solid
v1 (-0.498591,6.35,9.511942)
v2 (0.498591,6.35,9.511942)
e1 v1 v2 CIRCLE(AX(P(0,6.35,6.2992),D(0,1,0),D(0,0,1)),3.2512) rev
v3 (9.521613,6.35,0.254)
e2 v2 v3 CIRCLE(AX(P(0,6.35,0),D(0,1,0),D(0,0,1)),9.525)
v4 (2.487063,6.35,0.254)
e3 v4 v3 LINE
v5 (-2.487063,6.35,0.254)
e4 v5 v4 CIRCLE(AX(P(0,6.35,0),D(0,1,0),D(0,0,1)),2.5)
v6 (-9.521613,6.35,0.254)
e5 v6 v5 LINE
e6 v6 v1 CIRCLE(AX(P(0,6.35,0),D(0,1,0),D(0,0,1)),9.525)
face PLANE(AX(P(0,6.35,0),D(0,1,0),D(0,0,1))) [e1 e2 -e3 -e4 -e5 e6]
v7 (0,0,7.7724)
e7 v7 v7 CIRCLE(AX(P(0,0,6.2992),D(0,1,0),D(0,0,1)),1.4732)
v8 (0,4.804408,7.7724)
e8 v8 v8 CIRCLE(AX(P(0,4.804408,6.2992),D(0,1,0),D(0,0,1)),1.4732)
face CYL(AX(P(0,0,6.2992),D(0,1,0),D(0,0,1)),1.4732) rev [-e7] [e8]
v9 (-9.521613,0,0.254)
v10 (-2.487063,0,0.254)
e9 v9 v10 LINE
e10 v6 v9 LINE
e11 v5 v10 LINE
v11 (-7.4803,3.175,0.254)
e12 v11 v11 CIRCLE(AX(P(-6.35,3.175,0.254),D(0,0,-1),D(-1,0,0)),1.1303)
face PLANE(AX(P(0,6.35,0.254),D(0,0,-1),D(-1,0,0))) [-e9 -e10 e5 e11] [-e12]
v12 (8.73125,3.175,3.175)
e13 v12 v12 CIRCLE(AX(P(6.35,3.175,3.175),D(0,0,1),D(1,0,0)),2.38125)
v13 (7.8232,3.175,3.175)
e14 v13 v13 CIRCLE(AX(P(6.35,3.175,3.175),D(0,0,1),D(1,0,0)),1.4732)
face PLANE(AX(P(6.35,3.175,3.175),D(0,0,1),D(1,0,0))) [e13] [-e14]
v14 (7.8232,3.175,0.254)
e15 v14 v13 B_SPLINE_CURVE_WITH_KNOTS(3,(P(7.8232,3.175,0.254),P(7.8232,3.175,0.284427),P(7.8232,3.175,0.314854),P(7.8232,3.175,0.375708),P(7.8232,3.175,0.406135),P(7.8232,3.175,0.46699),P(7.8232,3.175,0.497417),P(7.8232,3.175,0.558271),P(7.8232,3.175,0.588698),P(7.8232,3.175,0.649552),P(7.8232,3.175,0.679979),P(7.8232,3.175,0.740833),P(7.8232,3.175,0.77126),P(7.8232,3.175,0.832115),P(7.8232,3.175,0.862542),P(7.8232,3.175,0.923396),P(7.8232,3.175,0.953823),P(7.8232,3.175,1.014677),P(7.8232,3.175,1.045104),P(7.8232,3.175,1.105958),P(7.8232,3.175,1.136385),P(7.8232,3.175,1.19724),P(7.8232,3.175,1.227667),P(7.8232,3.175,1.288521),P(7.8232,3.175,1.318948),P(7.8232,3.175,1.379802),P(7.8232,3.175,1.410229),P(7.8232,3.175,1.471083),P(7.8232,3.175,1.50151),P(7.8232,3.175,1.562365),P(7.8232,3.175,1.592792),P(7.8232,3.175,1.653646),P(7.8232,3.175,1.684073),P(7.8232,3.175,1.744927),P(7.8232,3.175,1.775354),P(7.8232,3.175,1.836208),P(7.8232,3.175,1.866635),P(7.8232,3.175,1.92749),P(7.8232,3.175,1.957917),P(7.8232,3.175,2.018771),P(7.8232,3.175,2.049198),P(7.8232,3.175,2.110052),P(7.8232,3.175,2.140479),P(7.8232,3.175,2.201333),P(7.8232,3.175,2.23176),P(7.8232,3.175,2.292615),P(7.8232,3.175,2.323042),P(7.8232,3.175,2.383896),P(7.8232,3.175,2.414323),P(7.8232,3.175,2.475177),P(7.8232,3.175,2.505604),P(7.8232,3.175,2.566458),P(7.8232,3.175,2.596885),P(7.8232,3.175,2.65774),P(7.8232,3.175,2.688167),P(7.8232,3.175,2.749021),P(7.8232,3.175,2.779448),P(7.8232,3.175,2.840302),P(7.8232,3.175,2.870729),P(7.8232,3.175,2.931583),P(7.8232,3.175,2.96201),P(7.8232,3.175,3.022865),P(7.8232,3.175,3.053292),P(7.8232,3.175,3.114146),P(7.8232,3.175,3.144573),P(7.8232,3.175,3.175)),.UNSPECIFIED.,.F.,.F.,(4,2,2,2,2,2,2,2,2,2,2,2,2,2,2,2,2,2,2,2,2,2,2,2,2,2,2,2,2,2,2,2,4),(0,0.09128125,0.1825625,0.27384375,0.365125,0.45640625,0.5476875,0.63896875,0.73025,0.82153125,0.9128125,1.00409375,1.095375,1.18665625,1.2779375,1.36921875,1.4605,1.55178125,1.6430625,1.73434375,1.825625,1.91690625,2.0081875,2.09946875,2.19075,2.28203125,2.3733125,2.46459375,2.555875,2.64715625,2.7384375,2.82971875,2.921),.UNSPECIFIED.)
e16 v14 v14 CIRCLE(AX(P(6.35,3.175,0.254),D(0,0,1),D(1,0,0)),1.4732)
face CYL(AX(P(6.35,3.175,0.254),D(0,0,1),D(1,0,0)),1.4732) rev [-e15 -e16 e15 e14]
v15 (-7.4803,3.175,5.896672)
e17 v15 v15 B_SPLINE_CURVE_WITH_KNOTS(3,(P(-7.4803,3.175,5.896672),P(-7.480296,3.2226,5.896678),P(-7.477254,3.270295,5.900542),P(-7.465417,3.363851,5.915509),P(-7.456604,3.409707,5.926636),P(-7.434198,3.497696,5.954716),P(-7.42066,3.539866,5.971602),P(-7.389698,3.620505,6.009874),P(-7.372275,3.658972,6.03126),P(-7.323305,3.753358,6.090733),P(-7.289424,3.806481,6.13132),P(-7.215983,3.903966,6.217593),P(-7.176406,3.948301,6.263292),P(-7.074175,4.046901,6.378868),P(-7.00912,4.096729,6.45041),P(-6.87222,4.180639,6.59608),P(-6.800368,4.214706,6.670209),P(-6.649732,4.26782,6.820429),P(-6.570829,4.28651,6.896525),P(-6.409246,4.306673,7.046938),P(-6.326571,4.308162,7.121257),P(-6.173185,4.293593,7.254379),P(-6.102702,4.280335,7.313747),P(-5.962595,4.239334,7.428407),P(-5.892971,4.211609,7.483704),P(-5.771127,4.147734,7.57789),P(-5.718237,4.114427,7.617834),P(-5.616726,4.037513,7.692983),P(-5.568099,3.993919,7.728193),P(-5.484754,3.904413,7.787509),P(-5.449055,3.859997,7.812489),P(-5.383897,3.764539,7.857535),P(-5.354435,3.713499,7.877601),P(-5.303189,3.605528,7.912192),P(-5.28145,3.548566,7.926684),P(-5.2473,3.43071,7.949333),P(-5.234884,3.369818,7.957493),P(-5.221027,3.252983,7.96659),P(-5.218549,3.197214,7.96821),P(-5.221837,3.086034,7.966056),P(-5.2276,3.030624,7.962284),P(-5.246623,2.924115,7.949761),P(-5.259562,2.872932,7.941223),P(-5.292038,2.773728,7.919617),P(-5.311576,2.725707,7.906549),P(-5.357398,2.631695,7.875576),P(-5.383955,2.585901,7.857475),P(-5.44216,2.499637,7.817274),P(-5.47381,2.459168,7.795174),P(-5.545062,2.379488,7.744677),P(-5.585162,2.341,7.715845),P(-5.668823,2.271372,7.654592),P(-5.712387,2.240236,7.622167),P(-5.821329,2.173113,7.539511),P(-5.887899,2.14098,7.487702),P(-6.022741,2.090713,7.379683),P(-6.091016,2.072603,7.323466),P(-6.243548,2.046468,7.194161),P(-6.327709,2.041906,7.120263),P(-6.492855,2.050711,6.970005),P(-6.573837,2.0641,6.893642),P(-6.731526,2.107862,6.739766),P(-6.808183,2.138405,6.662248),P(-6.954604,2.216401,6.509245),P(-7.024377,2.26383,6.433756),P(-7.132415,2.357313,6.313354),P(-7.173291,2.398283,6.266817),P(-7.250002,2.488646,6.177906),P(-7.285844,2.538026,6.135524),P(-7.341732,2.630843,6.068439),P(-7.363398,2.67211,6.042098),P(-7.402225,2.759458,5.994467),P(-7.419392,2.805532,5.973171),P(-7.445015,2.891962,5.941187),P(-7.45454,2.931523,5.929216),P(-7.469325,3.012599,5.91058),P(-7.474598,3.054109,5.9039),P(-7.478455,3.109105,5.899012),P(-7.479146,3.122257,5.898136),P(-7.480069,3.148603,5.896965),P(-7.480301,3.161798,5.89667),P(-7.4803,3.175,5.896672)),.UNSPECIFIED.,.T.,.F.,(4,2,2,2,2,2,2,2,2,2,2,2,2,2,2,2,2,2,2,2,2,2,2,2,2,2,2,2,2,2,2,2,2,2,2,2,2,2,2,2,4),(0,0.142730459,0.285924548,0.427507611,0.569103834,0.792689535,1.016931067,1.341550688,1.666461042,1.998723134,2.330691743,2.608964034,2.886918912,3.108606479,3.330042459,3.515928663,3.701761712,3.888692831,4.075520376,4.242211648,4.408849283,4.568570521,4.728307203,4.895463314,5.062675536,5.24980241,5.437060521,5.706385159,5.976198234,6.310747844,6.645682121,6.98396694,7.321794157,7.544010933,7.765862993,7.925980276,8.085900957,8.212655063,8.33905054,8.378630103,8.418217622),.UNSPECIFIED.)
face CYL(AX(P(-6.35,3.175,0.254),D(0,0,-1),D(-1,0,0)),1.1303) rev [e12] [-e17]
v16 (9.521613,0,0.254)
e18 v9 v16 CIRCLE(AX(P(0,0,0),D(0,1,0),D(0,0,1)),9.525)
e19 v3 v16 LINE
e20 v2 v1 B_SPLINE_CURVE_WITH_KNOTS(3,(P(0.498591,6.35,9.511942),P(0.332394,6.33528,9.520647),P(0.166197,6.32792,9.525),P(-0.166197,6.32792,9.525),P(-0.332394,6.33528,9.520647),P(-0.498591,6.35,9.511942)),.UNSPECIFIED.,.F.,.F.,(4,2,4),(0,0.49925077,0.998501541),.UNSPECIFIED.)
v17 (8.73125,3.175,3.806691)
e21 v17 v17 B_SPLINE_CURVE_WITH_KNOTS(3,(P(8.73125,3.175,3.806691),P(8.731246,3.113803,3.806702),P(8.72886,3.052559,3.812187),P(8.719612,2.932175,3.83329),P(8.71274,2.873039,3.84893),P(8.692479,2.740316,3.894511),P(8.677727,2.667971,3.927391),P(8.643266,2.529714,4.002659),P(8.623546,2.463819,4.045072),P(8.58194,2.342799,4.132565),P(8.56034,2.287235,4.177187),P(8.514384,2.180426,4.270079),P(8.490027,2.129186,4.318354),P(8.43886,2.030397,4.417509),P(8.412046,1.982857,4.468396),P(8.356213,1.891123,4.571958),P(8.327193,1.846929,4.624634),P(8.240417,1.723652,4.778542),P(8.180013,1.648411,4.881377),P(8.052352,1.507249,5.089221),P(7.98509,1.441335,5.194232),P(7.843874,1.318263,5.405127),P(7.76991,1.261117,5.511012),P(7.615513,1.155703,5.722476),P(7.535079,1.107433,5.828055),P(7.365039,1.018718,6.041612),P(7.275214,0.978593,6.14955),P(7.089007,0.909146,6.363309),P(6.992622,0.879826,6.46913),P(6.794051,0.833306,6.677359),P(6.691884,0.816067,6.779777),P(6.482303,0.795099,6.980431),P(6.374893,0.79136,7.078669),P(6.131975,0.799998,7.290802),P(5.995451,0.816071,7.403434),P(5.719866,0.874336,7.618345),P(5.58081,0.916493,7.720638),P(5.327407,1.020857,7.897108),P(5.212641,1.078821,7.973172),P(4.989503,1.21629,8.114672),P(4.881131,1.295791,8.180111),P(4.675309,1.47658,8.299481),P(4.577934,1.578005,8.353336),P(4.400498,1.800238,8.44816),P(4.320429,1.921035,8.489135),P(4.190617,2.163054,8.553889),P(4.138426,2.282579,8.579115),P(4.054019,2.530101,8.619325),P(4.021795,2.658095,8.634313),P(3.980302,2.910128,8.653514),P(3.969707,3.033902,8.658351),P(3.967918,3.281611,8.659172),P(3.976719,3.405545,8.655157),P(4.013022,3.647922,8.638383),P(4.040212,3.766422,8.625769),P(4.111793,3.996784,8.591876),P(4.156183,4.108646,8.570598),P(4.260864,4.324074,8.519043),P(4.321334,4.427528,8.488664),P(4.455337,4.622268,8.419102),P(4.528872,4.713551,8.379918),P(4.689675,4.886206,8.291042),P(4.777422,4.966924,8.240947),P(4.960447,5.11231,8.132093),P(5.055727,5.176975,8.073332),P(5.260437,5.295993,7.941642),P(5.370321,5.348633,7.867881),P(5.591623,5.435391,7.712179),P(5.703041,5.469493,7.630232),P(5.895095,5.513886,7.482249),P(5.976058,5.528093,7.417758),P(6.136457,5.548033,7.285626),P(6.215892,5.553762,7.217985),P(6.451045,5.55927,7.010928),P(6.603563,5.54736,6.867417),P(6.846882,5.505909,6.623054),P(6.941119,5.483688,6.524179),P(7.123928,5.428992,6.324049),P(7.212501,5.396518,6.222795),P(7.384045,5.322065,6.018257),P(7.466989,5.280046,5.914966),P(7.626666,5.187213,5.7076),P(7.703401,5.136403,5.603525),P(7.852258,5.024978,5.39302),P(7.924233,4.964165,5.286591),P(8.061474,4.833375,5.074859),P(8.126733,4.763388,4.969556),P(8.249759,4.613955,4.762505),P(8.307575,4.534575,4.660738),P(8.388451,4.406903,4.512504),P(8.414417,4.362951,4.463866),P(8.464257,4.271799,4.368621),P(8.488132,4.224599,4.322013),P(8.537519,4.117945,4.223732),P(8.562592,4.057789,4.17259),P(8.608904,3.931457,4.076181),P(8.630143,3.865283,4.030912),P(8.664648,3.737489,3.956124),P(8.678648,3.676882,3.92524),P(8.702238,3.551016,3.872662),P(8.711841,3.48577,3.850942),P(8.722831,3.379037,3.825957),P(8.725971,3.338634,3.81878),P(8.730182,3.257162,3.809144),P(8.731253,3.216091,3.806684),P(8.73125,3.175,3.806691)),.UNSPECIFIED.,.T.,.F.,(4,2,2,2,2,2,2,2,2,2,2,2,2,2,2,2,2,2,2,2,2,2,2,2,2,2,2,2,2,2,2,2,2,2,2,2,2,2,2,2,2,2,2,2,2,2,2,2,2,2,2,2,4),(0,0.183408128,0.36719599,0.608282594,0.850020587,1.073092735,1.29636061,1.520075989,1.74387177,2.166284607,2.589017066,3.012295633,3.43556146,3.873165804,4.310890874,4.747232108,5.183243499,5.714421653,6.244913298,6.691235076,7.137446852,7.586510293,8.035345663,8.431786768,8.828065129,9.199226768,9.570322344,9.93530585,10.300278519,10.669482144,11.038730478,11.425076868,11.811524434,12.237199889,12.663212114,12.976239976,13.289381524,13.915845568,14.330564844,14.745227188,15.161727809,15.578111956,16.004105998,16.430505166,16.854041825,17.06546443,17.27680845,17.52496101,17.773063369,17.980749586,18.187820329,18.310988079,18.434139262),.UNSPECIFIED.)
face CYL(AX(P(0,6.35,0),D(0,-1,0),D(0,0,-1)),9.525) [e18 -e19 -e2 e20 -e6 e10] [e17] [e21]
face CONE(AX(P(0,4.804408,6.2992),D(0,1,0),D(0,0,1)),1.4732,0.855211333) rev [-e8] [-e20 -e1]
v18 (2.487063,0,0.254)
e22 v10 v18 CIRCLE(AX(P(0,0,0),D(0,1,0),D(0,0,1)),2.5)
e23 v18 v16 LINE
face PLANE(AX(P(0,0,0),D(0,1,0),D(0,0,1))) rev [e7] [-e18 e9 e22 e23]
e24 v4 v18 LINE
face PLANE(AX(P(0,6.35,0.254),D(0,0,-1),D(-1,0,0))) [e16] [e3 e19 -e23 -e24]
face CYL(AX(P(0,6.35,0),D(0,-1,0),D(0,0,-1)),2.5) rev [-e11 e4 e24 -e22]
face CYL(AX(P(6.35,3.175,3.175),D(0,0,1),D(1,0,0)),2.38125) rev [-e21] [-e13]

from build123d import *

# Parameters (mm, degrees)
BOSS_EXTRUDE1_DEPTH   = 6.35
F_4_40_TAPPED_HOLE1_D = 2.2606
SKETCH8_R             = 2.38125
CUT_EXTRUDE1_DEPTH    = 6.35
SKETCH9_R             = 1.4732
CUT_EXTRUDE2_DEPTH    = 14.088396137
SKETCH10_R            = 1.4732
CUT_EXTRUDE3_DEPTH    = 15.889903931
CHAMFER1_SIZE         = 1.778
CHAMFER1_SIZE_2       = 1.54559182


with BuildPart() as part:
    # Sketch1 → Boss-Extrude1 (new body)
    with BuildSketch(Plane(origin=(0, 0, 0), x_dir=(1, 0, 0), z_dir=(0, 1, 0))):
        with BuildLine():
            Line((-2.487063329, -0.254), (-9.521612731, -0.254))
            ThreePointArc((-9.521612731, -0.254), (0, -9.525), (9.521612731, -0.254))
            Line((9.521612731, -0.254), (2.487063329, -0.254))
            ThreePointArc((2.487063329, -0.254), (0, -2.5), (-2.487063329, -0.254))
        make_face()
    extrude(amount=BOSS_EXTRUDE1_DEPTH)

    # #4-40 Tapped Hole1 (through all)
    with Locations(Plane(origin=(0, 0, 0.254), x_dir=(-1, 0, 0), z_dir=(0, 0, -1))):
        with Locations((6.35, 3.175)):
            Hole(F_4_40_TAPPED_HOLE1_D / 2)

    # Sketch8 → Cut-Extrude1 (cut)
    with BuildSketch(Plane.XY.offset(9.525)):
        with Locations((6.35, 3.175)):
            Circle(SKETCH8_R)
    extrude(amount=-CUT_EXTRUDE1_DEPTH, mode=Mode.SUBTRACT)

    # Sketch9 → Cut-Extrude2 (cut, through all)
    with BuildSketch(Plane.XY.offset(3.175)):
        with Locations((6.35, 3.175)):
            Circle(SKETCH9_R)
    extrude(amount=-CUT_EXTRUDE2_DEPTH, mode=Mode.SUBTRACT)

    # Sketch10 → Cut-Extrude3 (cut, through all)
    with BuildSketch(Plane(origin=(0, 6.35, 0), x_dir=(1, 0, 0), z_dir=(0, 1, 0))):
        with Locations(Location((0, -6.2992, 0), (0, 0, 270))):
            Circle(SKETCH10_R)
    extrude(amount=-CUT_EXTRUDE3_DEPTH, mode=Mode.SUBTRACT)

    # Chamfer1
    # the kernel refuses this chamfer: 1.778, 1.54559182 mm, written as the material it takes off along each edge
    with BuildSketch(Plane(origin=(0, 6.35, 6.2992), x_dir=(0, 0, 1), z_dir=(-1, 0, 0))) as chamfer1_piece_1:
        Polygon((1.4732 + CHAMFER1_SIZE, 0), (1.4732, -CHAMFER1_SIZE_2), (1.4732, 0), align=None)
    revolve(axis=Axis((0, 6.35, 6.2992), (0, 1, 0)), mode=Mode.SUBTRACT)


solid = part.part
